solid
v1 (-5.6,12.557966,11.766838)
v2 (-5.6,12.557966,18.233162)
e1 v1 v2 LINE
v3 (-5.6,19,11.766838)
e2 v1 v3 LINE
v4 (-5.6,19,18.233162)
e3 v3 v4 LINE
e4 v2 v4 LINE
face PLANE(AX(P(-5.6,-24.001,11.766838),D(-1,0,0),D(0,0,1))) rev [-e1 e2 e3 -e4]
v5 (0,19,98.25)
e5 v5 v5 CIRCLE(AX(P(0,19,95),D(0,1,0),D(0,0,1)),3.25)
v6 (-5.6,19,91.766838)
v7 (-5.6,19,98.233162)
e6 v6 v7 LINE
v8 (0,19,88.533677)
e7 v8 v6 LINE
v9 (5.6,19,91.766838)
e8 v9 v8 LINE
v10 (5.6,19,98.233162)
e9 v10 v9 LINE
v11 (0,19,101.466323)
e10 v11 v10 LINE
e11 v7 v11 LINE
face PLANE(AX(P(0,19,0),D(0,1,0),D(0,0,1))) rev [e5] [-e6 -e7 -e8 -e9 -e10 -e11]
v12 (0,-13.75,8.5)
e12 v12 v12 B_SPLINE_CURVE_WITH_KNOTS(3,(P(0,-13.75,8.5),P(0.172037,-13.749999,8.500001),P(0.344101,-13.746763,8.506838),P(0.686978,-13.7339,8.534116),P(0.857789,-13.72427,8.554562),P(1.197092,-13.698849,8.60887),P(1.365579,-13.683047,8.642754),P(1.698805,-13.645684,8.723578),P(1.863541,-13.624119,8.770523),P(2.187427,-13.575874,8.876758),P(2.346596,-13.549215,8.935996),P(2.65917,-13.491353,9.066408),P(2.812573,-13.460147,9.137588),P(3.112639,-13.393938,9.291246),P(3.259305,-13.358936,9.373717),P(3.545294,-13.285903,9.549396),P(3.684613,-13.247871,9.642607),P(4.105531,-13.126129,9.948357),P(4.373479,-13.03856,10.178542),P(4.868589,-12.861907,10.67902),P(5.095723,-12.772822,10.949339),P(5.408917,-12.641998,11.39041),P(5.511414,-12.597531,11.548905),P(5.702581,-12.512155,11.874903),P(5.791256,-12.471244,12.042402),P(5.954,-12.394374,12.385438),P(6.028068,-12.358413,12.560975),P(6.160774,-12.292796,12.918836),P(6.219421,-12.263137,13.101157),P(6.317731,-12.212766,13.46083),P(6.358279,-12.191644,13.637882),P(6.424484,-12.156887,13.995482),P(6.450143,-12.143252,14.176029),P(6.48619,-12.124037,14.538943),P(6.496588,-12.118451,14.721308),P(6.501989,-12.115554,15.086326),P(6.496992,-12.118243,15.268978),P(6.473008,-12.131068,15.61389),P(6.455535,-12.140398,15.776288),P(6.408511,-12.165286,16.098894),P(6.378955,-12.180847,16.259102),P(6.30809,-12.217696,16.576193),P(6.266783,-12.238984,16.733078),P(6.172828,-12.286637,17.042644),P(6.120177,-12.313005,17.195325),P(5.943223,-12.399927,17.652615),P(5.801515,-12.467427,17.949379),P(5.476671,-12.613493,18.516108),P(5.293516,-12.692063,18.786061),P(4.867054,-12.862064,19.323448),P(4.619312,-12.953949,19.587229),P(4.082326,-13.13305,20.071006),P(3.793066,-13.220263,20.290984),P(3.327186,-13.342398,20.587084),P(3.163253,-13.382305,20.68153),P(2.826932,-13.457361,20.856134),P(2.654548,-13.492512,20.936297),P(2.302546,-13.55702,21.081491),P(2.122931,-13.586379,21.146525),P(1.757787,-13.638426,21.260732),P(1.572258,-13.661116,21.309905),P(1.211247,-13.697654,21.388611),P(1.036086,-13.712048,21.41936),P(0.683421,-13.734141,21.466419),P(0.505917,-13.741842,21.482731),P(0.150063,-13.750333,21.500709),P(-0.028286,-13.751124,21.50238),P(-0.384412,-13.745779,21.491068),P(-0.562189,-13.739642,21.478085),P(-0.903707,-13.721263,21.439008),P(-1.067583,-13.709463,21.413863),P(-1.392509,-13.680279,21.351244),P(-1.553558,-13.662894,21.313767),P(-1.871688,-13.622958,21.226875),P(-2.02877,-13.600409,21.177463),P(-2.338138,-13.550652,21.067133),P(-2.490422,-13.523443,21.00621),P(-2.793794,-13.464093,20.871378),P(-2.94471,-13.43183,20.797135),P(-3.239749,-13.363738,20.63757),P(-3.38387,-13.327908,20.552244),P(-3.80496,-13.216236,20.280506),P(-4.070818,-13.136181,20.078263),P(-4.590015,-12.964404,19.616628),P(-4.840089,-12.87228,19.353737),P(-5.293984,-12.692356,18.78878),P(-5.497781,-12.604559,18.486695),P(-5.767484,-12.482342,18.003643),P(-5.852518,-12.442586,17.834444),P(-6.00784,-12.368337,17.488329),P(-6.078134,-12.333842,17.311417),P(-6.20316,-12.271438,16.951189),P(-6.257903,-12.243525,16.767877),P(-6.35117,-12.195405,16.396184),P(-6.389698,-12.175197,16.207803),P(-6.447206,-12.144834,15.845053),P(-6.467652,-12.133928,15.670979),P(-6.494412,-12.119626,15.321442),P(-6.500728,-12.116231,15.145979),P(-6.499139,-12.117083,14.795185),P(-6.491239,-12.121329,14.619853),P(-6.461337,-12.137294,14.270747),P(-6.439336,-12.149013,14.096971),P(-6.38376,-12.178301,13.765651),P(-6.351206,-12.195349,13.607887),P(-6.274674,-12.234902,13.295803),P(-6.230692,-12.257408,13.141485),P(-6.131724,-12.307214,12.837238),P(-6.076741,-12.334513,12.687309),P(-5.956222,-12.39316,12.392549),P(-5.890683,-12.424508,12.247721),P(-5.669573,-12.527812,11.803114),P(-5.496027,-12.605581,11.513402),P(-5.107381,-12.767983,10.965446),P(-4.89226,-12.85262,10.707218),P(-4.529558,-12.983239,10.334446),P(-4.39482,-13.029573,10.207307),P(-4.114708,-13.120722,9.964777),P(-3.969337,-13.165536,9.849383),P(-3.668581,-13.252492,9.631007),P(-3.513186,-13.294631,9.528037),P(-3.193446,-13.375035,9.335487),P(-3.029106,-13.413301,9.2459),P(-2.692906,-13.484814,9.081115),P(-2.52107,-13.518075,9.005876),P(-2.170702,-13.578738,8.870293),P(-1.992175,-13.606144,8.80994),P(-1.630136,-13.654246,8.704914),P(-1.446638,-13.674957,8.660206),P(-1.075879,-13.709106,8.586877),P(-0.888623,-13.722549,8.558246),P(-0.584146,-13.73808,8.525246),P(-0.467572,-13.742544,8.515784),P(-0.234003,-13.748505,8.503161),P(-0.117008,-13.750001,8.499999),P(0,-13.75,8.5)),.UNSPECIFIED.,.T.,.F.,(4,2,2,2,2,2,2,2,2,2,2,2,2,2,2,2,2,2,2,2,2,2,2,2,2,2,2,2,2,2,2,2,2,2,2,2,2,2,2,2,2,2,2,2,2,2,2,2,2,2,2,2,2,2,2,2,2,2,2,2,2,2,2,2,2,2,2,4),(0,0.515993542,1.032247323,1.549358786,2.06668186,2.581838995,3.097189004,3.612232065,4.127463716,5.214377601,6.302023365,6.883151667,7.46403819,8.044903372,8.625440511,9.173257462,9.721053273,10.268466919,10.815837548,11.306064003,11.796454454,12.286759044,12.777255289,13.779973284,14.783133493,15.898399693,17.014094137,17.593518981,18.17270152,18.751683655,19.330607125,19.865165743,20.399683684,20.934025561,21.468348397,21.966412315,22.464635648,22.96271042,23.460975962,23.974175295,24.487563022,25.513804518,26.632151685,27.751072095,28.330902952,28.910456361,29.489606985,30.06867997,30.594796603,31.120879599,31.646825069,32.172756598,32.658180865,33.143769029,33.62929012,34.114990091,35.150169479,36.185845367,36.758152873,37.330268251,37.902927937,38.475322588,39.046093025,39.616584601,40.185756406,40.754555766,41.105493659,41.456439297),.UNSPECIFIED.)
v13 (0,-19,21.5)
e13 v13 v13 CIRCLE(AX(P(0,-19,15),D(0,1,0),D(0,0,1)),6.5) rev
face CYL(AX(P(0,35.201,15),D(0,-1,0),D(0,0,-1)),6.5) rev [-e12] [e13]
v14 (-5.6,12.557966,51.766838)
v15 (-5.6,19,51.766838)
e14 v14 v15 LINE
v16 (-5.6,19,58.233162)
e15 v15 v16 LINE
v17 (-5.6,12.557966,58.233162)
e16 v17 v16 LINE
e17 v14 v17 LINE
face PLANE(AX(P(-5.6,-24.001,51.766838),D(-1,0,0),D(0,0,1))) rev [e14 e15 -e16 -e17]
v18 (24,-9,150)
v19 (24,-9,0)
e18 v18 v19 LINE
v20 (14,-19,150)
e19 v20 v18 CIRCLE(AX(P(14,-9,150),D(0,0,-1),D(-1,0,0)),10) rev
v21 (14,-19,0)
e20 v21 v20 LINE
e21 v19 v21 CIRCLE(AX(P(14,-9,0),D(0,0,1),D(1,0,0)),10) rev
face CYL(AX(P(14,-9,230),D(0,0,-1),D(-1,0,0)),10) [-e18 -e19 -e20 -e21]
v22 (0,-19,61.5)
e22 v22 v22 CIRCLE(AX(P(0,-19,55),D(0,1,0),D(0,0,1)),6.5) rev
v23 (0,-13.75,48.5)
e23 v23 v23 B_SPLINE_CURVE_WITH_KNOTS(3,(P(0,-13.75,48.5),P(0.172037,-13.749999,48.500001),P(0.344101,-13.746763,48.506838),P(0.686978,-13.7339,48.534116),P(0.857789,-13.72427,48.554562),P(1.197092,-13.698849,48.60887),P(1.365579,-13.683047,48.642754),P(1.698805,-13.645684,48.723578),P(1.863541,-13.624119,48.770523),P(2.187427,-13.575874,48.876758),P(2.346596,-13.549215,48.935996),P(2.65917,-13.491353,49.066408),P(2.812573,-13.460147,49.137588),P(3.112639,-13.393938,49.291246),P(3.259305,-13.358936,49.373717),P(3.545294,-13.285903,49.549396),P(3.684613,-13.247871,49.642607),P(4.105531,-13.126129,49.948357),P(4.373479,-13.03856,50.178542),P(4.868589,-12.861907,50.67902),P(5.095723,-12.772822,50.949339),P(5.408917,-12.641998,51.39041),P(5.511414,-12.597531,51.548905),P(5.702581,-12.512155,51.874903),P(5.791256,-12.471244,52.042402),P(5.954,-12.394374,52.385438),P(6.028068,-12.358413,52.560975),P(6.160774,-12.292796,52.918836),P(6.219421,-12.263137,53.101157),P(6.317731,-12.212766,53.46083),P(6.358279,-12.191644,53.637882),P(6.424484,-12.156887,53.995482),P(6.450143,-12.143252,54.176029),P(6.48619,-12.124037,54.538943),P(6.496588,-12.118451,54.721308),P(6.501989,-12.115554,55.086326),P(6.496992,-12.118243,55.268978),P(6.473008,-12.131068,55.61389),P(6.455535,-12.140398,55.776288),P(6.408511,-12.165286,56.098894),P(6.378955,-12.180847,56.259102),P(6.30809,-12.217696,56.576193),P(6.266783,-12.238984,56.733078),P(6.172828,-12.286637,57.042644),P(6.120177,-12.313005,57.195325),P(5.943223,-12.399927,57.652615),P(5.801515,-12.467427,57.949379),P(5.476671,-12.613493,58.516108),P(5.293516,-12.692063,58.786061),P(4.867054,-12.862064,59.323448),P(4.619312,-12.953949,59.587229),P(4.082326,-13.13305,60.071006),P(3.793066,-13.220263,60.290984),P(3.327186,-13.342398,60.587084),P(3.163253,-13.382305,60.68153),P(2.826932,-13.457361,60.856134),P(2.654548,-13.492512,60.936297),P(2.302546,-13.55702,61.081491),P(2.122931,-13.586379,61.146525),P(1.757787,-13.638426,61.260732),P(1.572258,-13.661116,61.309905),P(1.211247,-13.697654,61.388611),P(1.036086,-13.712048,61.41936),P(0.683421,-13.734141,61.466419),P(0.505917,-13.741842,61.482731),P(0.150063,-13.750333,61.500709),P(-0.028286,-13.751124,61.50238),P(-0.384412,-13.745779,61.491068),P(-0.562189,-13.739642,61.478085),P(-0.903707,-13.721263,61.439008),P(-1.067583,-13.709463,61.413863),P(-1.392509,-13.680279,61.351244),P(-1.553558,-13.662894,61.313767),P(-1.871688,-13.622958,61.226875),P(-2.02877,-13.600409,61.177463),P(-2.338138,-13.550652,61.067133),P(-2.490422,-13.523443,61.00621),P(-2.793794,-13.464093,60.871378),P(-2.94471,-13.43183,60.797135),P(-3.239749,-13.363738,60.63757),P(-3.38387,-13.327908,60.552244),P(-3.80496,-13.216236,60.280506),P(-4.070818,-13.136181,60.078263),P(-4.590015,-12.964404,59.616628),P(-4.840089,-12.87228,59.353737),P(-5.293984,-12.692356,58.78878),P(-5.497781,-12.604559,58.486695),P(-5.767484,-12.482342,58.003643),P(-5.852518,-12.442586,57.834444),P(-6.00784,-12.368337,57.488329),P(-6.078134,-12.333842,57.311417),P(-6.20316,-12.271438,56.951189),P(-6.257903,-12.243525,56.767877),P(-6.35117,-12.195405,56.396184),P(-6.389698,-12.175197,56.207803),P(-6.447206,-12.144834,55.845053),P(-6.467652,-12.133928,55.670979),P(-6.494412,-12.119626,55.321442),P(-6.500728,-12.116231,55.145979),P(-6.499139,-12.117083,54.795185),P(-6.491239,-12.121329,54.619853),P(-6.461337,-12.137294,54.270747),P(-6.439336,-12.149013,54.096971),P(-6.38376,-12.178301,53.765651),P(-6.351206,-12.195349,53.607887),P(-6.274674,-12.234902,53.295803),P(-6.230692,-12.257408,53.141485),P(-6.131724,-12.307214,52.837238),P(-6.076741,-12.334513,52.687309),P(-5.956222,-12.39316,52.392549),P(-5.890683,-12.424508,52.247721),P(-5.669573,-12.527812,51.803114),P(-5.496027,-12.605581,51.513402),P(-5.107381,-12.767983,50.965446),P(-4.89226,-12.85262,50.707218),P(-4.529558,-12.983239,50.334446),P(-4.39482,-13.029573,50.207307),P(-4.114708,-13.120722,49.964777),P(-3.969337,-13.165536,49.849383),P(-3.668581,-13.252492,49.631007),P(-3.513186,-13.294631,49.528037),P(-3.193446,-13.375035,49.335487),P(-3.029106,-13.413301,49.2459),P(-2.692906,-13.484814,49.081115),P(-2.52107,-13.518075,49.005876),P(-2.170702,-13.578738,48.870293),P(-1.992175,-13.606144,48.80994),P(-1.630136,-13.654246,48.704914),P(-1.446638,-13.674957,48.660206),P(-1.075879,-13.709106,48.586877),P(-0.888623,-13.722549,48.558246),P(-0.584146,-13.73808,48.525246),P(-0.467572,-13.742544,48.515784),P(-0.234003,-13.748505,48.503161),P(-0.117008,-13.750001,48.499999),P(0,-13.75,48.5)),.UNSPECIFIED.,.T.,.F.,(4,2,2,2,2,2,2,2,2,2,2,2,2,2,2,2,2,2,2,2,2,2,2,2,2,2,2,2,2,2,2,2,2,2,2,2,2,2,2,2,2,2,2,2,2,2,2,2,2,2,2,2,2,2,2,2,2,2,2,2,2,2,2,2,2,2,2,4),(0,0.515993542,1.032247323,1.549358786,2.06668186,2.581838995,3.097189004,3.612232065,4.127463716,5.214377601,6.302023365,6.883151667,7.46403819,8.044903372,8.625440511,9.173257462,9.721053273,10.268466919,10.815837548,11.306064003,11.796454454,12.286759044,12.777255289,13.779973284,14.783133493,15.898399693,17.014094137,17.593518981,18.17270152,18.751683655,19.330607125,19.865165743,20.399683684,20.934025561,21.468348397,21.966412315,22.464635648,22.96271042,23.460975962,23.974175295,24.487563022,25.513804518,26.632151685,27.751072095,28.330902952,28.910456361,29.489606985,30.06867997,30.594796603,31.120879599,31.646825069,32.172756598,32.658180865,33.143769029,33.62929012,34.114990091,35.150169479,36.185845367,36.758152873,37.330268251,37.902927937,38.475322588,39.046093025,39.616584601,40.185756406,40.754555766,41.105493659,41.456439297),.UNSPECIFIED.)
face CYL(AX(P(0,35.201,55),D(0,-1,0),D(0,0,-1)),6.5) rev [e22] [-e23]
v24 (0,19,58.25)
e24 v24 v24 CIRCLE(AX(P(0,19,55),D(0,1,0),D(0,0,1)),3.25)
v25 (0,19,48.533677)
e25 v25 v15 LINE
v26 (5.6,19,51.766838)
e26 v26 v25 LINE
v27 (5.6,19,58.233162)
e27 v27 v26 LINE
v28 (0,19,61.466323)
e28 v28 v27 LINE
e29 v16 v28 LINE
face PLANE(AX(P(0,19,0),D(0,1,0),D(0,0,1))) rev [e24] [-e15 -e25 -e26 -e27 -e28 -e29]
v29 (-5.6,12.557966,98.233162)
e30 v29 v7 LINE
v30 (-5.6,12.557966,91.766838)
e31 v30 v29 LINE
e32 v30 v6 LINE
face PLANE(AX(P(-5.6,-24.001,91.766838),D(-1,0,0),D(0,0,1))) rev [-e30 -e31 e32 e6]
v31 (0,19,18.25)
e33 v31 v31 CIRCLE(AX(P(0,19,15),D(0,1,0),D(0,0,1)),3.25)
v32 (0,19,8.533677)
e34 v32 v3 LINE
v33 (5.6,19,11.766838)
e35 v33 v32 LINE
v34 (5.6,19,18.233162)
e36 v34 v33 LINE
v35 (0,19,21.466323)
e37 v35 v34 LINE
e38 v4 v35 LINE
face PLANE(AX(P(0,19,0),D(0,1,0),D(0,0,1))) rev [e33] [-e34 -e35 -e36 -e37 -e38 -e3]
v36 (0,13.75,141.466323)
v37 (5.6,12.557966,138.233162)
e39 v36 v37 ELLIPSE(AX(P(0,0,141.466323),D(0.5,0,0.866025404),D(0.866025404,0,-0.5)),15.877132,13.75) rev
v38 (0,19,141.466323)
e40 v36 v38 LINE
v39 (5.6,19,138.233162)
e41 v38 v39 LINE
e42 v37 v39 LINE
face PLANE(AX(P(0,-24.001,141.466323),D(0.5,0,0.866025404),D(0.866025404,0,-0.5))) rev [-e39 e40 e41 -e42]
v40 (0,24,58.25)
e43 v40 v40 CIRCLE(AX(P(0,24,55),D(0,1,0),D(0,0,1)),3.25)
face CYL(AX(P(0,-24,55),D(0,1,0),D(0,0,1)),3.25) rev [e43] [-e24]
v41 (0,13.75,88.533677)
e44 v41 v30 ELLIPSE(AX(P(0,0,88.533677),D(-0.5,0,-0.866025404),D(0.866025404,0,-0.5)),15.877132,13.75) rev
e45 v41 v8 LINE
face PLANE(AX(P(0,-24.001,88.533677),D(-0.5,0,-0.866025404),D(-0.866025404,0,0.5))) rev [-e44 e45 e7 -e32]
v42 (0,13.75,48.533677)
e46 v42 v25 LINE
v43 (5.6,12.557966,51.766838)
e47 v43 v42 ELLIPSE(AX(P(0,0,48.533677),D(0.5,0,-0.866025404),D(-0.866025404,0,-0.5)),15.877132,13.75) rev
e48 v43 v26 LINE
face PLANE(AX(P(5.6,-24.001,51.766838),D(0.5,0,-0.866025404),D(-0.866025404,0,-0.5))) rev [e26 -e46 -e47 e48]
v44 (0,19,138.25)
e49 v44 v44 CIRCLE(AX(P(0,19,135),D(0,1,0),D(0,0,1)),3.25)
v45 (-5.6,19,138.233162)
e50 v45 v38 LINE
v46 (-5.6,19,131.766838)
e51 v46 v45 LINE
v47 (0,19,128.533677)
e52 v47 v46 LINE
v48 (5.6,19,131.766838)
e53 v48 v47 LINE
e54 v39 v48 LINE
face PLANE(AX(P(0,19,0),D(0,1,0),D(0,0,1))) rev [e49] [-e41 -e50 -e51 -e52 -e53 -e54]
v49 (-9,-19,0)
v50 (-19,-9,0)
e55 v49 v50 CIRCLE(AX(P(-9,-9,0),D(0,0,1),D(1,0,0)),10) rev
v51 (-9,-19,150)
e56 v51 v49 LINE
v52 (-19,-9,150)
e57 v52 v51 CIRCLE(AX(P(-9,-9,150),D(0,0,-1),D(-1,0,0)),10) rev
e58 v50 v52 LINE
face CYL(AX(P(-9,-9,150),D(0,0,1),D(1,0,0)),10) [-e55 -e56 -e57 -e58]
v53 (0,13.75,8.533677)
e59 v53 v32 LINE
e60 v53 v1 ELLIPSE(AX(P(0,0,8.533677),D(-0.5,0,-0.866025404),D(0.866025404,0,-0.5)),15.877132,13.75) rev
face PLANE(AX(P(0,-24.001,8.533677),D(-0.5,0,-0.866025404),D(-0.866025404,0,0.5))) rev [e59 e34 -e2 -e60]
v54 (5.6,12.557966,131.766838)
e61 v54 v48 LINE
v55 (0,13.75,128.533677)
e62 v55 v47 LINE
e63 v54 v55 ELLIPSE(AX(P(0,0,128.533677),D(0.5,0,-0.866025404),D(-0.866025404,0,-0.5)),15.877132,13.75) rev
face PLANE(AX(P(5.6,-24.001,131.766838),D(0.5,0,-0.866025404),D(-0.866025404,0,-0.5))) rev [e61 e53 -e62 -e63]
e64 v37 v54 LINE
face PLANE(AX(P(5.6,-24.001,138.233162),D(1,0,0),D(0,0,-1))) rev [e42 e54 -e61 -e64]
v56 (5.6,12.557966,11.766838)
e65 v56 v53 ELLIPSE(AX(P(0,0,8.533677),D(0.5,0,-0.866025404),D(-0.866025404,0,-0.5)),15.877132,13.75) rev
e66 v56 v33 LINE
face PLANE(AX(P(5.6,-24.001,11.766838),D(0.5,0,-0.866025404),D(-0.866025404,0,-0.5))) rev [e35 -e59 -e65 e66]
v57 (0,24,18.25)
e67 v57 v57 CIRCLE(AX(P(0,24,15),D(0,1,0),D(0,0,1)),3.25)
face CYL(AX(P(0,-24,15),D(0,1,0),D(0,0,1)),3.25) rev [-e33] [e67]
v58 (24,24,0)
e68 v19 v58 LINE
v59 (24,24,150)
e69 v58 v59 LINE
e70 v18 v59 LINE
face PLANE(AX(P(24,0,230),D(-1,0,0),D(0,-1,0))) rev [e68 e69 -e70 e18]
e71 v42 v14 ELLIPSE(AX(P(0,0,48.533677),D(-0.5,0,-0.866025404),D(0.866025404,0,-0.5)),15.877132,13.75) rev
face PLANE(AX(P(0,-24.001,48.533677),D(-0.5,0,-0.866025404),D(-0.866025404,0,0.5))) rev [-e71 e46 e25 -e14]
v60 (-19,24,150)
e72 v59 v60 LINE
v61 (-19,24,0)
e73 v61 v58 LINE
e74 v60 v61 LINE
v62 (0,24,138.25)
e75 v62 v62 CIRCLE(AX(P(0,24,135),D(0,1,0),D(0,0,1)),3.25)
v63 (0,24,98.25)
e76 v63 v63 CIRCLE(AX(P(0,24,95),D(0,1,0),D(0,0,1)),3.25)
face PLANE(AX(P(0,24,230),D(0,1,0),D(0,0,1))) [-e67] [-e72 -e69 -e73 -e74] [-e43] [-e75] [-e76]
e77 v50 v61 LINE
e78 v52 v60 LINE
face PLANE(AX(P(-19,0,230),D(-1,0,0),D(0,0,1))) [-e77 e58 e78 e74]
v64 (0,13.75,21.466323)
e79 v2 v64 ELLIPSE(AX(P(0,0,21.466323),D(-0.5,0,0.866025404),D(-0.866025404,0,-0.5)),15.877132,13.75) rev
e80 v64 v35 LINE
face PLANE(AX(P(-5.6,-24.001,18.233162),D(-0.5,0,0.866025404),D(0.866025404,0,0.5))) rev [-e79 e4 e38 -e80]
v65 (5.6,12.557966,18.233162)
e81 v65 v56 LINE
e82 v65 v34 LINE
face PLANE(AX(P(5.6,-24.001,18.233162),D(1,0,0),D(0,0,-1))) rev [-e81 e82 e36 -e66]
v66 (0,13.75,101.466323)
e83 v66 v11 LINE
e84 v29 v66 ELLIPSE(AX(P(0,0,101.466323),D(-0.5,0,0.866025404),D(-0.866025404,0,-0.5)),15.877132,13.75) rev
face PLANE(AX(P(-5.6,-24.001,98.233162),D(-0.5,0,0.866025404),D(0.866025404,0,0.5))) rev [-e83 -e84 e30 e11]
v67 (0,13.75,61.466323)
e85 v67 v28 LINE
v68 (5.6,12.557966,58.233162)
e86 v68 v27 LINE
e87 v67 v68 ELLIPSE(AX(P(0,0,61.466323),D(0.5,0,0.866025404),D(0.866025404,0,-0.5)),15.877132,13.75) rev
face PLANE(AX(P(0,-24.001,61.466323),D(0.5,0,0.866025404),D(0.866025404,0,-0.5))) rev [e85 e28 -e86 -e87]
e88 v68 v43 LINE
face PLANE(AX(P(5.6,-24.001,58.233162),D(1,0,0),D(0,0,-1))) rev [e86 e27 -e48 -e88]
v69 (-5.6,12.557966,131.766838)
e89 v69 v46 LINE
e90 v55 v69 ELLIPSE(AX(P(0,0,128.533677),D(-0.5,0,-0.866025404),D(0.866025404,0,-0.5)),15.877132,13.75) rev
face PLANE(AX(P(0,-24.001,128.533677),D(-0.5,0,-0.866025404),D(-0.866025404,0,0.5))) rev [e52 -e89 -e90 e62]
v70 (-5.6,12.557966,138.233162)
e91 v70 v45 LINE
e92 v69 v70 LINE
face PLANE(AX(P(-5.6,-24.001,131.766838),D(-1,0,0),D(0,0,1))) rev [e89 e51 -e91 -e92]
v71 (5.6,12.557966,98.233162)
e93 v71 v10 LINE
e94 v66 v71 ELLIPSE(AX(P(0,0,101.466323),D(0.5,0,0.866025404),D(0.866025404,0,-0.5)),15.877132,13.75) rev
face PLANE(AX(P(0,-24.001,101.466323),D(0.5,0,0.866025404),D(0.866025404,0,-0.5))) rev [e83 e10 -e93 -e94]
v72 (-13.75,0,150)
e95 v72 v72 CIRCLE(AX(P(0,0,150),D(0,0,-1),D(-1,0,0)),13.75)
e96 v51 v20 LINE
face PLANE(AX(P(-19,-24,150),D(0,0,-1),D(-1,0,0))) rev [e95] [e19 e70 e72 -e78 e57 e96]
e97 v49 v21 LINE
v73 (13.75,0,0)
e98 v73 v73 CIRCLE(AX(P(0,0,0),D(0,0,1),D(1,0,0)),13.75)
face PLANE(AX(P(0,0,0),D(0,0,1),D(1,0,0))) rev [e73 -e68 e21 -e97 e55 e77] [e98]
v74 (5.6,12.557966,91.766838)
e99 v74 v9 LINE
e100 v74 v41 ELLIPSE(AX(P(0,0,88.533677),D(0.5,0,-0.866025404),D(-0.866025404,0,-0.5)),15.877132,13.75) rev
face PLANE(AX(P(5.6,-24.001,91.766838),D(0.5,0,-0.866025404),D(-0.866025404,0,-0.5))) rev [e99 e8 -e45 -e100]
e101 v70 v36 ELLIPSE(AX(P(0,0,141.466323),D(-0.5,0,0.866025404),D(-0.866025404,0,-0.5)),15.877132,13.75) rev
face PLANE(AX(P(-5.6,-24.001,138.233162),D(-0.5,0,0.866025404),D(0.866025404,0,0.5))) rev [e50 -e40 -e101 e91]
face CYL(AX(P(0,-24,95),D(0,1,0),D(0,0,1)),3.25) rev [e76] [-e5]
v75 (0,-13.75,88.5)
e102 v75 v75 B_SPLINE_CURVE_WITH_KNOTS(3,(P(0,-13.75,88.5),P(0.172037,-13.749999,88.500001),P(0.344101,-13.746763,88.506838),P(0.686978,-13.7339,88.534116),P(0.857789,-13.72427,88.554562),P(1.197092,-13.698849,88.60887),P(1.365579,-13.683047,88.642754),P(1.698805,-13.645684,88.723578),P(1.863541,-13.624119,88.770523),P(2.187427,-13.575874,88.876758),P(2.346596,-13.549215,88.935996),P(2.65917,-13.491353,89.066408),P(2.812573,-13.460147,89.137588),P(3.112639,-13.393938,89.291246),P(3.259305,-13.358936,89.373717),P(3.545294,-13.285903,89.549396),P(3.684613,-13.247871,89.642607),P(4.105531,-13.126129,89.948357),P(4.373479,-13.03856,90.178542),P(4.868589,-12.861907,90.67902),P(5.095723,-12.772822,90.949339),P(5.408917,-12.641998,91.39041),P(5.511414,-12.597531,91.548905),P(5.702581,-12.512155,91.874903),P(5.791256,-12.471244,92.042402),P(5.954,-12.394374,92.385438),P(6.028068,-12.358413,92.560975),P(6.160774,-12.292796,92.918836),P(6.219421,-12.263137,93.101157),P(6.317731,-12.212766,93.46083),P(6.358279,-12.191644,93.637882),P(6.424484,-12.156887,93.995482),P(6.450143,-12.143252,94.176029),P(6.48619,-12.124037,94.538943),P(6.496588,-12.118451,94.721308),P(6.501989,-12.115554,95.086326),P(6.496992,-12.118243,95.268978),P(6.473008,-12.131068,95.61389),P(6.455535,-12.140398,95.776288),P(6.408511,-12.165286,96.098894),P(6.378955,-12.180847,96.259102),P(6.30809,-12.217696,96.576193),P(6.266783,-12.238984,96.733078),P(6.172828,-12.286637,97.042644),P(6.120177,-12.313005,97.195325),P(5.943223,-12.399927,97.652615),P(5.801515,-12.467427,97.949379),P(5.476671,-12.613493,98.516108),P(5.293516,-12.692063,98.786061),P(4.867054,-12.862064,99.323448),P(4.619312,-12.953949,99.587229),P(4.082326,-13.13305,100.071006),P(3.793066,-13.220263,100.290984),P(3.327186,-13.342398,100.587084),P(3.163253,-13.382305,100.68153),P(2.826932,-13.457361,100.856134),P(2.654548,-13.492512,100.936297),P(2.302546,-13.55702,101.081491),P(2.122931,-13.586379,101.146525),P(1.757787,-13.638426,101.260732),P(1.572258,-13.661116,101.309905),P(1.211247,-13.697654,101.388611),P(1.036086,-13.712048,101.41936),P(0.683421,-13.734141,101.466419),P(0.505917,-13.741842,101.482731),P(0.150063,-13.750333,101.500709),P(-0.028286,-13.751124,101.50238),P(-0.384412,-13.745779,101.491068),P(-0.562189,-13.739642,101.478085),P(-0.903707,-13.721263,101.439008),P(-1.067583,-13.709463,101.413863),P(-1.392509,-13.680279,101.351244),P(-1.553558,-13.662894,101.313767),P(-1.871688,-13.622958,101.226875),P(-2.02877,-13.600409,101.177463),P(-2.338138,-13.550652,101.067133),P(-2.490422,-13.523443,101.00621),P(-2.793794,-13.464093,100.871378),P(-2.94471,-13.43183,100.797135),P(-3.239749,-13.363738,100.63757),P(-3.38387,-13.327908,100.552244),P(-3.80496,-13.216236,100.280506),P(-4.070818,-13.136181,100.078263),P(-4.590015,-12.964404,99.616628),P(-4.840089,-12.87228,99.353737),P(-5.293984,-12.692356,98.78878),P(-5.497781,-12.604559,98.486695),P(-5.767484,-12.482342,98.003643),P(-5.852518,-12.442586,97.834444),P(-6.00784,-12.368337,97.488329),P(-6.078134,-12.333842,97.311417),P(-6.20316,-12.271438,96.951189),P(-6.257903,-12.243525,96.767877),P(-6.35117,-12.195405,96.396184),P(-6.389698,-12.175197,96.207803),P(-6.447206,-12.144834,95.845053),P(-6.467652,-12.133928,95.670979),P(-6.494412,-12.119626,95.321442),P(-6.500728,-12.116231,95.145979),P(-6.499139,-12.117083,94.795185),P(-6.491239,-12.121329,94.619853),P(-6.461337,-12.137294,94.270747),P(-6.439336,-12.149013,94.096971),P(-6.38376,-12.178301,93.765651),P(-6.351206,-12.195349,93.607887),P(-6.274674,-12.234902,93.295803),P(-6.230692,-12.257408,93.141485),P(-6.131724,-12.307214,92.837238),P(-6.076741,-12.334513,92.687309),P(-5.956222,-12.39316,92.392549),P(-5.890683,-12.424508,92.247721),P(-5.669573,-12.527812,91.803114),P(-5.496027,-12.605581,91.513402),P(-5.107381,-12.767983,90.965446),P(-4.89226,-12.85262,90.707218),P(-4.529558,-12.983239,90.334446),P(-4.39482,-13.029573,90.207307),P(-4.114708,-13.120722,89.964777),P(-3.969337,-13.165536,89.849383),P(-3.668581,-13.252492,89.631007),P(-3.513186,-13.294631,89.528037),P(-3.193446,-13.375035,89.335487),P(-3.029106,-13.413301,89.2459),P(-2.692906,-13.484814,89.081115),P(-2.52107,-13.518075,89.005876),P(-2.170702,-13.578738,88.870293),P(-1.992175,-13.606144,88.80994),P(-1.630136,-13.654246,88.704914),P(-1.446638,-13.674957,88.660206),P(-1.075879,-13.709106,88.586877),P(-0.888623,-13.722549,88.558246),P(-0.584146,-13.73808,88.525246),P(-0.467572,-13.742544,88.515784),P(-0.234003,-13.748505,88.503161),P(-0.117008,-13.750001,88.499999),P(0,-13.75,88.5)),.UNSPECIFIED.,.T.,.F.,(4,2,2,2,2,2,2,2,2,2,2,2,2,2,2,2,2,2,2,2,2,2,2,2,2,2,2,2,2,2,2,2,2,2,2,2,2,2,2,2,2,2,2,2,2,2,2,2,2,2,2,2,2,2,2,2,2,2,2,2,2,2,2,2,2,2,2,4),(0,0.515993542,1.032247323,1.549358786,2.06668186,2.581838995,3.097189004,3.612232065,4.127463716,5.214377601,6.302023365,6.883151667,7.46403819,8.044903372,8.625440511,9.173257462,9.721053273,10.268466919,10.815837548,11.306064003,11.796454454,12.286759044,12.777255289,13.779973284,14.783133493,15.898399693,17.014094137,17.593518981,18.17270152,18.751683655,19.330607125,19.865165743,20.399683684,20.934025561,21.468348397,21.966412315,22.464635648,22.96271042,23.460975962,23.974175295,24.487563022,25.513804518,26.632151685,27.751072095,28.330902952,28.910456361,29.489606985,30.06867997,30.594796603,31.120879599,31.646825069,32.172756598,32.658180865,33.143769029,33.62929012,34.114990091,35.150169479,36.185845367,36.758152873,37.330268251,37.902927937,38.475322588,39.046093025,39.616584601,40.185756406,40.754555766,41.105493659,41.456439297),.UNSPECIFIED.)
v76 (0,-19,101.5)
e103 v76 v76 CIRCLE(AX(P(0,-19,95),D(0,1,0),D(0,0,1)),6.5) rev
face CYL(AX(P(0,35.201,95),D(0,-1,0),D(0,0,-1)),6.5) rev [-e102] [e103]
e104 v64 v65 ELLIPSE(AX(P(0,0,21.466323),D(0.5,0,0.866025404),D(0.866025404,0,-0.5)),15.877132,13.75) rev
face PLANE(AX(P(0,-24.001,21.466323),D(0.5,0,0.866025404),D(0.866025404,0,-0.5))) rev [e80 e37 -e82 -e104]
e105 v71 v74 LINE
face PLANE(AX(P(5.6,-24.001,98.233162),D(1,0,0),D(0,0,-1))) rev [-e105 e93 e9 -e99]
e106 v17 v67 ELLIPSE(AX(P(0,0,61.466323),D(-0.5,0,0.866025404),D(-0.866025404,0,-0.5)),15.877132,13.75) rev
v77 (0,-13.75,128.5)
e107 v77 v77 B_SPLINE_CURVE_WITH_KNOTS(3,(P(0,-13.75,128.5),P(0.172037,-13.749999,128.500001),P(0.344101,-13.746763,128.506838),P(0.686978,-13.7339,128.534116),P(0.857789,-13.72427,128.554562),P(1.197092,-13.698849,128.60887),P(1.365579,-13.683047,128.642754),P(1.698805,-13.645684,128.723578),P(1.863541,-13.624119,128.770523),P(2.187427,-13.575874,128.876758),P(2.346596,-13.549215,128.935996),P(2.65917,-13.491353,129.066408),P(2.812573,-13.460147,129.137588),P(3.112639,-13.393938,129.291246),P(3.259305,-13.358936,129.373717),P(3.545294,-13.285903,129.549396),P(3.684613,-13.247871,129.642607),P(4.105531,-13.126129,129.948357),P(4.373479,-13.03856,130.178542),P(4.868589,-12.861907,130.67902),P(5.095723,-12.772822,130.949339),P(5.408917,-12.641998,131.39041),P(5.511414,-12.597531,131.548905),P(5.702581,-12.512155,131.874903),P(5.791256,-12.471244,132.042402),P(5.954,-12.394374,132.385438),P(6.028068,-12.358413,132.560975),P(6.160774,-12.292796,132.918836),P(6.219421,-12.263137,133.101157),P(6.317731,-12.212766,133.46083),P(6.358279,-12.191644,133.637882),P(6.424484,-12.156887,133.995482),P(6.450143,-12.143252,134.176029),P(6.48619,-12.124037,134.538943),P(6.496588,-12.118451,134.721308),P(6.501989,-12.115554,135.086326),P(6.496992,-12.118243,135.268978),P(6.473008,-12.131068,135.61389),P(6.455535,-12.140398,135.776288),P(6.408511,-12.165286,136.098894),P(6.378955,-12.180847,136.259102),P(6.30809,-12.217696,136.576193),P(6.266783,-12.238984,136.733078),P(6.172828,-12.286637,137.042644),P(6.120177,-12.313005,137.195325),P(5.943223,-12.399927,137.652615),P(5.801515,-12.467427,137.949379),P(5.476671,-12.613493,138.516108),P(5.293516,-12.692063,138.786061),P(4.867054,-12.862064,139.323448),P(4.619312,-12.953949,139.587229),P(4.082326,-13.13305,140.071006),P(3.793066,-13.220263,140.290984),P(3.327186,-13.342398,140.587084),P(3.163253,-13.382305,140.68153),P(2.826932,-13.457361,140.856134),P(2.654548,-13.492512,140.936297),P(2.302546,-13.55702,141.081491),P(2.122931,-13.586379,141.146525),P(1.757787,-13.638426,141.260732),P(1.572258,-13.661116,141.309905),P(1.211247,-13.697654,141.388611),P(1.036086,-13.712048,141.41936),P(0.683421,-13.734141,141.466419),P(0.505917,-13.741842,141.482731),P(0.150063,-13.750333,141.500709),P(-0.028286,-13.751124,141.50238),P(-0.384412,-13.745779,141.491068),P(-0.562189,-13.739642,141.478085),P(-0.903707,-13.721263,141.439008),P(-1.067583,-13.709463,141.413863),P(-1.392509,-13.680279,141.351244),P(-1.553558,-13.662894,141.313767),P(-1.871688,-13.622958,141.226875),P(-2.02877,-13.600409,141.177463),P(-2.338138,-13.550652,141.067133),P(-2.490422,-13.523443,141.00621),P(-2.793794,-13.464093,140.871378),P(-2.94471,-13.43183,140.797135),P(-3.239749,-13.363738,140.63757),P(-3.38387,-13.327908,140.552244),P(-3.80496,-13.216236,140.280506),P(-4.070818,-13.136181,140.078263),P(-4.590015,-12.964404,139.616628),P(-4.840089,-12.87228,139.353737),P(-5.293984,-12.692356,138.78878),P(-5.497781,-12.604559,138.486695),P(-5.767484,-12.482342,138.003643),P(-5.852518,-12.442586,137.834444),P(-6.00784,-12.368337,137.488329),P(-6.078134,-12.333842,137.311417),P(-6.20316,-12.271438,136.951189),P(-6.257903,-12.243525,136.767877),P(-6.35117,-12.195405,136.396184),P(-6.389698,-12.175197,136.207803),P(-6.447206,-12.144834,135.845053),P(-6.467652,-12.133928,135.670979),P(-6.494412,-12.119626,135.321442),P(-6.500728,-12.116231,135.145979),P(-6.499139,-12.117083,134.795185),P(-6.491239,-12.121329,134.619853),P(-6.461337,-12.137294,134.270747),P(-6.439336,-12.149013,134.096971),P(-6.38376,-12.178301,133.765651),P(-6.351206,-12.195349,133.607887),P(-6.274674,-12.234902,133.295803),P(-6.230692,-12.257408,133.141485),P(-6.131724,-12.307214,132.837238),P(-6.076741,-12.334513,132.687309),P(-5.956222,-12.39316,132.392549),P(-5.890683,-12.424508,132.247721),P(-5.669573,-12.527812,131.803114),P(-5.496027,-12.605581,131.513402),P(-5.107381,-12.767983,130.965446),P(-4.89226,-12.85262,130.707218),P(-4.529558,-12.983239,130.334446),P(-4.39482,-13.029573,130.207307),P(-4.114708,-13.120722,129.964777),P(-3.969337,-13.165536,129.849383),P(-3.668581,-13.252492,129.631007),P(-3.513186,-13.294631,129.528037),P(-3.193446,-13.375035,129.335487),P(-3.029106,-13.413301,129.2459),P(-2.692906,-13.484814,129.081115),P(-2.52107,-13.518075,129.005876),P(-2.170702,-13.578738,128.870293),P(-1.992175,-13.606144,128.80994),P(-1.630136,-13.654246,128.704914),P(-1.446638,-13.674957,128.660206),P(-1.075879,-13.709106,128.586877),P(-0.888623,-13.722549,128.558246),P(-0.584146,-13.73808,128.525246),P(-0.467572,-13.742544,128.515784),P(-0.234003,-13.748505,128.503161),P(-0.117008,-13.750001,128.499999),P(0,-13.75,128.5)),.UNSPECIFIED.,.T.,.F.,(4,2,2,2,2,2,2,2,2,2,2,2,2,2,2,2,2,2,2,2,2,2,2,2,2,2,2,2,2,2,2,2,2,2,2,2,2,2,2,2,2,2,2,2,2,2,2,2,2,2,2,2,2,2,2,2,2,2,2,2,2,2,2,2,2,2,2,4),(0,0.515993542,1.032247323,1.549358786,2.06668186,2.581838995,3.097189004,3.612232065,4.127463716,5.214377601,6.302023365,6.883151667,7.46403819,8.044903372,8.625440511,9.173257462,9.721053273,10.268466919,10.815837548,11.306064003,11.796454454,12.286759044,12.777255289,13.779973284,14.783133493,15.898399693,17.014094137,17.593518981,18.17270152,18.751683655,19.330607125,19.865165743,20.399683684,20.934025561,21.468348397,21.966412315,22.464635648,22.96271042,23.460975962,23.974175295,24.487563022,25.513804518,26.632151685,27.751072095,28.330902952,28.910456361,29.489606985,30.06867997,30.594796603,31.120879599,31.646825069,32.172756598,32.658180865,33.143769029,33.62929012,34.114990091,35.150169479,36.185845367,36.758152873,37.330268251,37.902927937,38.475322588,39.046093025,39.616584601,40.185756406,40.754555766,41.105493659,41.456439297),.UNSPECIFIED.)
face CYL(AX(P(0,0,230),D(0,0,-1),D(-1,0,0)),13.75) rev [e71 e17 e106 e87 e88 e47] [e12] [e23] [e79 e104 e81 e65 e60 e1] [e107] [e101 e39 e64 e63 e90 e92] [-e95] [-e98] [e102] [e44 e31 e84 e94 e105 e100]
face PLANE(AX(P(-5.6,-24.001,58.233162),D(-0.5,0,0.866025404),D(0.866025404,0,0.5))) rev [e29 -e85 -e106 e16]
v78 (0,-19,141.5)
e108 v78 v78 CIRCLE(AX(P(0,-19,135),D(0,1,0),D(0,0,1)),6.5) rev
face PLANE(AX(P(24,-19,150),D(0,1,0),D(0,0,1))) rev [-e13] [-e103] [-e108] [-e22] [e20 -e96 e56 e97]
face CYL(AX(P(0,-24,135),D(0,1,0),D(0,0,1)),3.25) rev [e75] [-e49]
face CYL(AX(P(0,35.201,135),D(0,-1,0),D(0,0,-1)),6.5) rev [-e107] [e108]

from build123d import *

# Parameters (mm, degrees)
SKETCH1_W               = 38
SKETCH1_H               = 48
SKETCH1_R               = 13.75
SKETCH1_H_2             = 10
BOSS_EXTRUDE1_DEPTH     = 230
SKETCH3_R               = 6
CUT_EXTRUDE1_DEPTH      = 0.5
SKETCH4_R               = 3.25
CUT_EXTRUDE2_DEPTH      = 239.706179225
CUT_EXTRUDE3_REACH      = 240.706
CUT_EXTRUDE3_END_RADIUS = 13.75
SKETCH5_R               = 6.5
CUT_EXTRUDE4_REACH      = 243.178
CUT_EXTRUDE4_END_RADIUS = 13.75
CUT_EXTRUDE4_START      = -5
CHAMFER1_SIZE           = 5
SKETCH8_W               = 230
SKETCH8_H               = 1.2
CUT_EXTRUDE6_DEPTH      = 10
SKETCH9_W               = 43
SKETCH9_H               = 80
CUT_EXTRUDE7_DEPTH      = 237.177899168
SKETCH10_W              = 43
SKETCH10_H              = 5
CUT_EXTRUDE8_DEPTH      = 154.792067529
FILLET1_R               = 10


with BuildPart() as part:
    # Sketch1 → Boss-Extrude1 (new body)
    # profile 1 of 3: a face of its own
    with BuildSketch(Plane.XY):
        Rectangle(SKETCH1_W, SKETCH1_H)
        Circle(SKETCH1_R, mode=Mode.SUBTRACT)
    # profile 2 of 3: a face of its own
    with BuildSketch(Plane.XY):
        with Locations((0, 30.2)):
            Rectangle(SKETCH1_W, SKETCH1_H_2)
    # profile 3 of 3: a face of its own
    with BuildSketch(Plane.XY):
        Polygon((19, 24), (19, -24), (24, -24), (24, 35.2), (19, 35.2), (19, 25.2), align=None)
    extrude(amount=BOSS_EXTRUDE1_DEPTH)

    # Sketch3 → Cut-Extrude1 (cut)
    with BuildSketch(Plane(origin=(0, 35.2, 0), x_dir=(1, 0, 0), z_dir=(0, 1, 0))):
        with Locations(Location((0, -15, 0), (0, 0, 270))):
            Circle(SKETCH3_R)
        with Locations(Location((0, -55, 0), (0, 0, 270))):
            Circle(SKETCH3_R)
        with Locations(Location((0, -95, 0), (0, 0, 270))):
            Circle(SKETCH3_R)
        with Locations(Location((0, -135, 0), (0, 0, 270))):
            Circle(SKETCH3_R)
        with Locations(Location((0, -175, 0), (0, 0, 270))):
            Circle(SKETCH3_R)
        with Locations(Location((0, -215, 0), (0, 0, 270))):
            Circle(SKETCH3_R)
    extrude(amount=-CUT_EXTRUDE1_DEPTH, mode=Mode.SUBTRACT)

    # Sketch4 → Cut-Extrude2 (cut, through all)
    with BuildSketch(Plane(origin=(0, 35.2, 0), x_dir=(1, 0, 0), z_dir=(0, 1, 0))):
        with Locations(Location((0, -15, 0), (0, 0, 270))):
            Circle(SKETCH4_R)
        with Locations(Location((0, -55, 0), (0, 0, 270))):
            Circle(SKETCH4_R)
        with Locations(Location((0, -95, 0), (0, 0, 270))):
            Circle(SKETCH4_R)
        with Locations(Location((0, -135, 0), (0, 0, 270))):
            Circle(SKETCH4_R)
        with Locations(Location((0, -175, 0), (0, 0, 270))):
            Circle(SKETCH4_R)
        with Locations(Location((0, -215, 0), (0, 0, 270))):
            Circle(SKETCH4_R)
    extrude(amount=-CUT_EXTRUDE2_DEPTH, mode=Mode.SUBTRACT)

    # Cut-Extrude3: up to this cylinder (the profile starts outside it)
    cut_extrude3_end = Plane(origin=(0, 0, 115), z_dir=(0, 0, -1)) * Cylinder(CUT_EXTRUDE3_END_RADIUS, 709.912, mode=Mode.PRIVATE)
    # Sketch5 → Cut-Extrude3 (cut, up to the surface)
    with BuildSketch(Plane.XZ.offset(24), mode=Mode.PRIVATE) as cut_extrude3_sk1:
        with Locations(Location((0, 215, 0), (0, 0, 270))):
            Circle(SKETCH5_R)
    cut_extrude3_tool1 = extrude(cut_extrude3_sk1.sketch, amount=-CUT_EXTRUDE3_REACH, mode=Mode.PRIVATE) - cut_extrude3_end
    add(cut_extrude3_tool1.solids().sort_by_distance((0, -24, 215))[0], mode=Mode.SUBTRACT)
    # Sketch5 → Cut-Extrude3 (cut, up to the surface)
    with BuildSketch(Plane.XZ.offset(24), mode=Mode.PRIVATE) as cut_extrude3_sk2:
        with Locations(Location((0, 175, 0), (0, 0, 270))):
            Circle(SKETCH5_R)
    cut_extrude3_tool2 = extrude(cut_extrude3_sk2.sketch, amount=-CUT_EXTRUDE3_REACH, mode=Mode.PRIVATE) - cut_extrude3_end
    add(cut_extrude3_tool2.solids().sort_by_distance((0, -24, 175))[0], mode=Mode.SUBTRACT)
    # Sketch5 → Cut-Extrude3 (cut, up to the surface)
    with BuildSketch(Plane.XZ.offset(24), mode=Mode.PRIVATE) as cut_extrude3_sk3:
        with Locations(Location((0, 135, 0), (0, 0, 270))):
            Circle(SKETCH5_R)
    cut_extrude3_tool3 = extrude(cut_extrude3_sk3.sketch, amount=-CUT_EXTRUDE3_REACH, mode=Mode.PRIVATE) - cut_extrude3_end
    add(cut_extrude3_tool3.solids().sort_by_distance((0, -24, 135))[0], mode=Mode.SUBTRACT)
    # Sketch5 → Cut-Extrude3 (cut, up to the surface)
    with BuildSketch(Plane.XZ.offset(24), mode=Mode.PRIVATE) as cut_extrude3_sk4:
        with Locations(Location((0, 95, 0), (0, 0, 270))):
            Circle(SKETCH5_R)
    cut_extrude3_tool4 = extrude(cut_extrude3_sk4.sketch, amount=-CUT_EXTRUDE3_REACH, mode=Mode.PRIVATE) - cut_extrude3_end
    add(cut_extrude3_tool4.solids().sort_by_distance((0, -24, 95))[0], mode=Mode.SUBTRACT)
    # Sketch5 → Cut-Extrude3 (cut, up to the surface)
    with BuildSketch(Plane.XZ.offset(24), mode=Mode.PRIVATE) as cut_extrude3_sk5:
        with Locations(Location((0, 55, 0), (0, 0, 270))):
            Circle(SKETCH5_R)
    cut_extrude3_tool5 = extrude(cut_extrude3_sk5.sketch, amount=-CUT_EXTRUDE3_REACH, mode=Mode.PRIVATE) - cut_extrude3_end
    add(cut_extrude3_tool5.solids().sort_by_distance((0, -24, 55))[0], mode=Mode.SUBTRACT)
    # Sketch5 → Cut-Extrude3 (cut, up to the surface)
    with BuildSketch(Plane.XZ.offset(24), mode=Mode.PRIVATE) as cut_extrude3_sk6:
        with Locations(Location((0, 15, 0), (0, 0, 270))):
            Circle(SKETCH5_R)
    cut_extrude3_tool6 = extrude(cut_extrude3_sk6.sketch, amount=-CUT_EXTRUDE3_REACH, mode=Mode.PRIVATE) - cut_extrude3_end
    add(cut_extrude3_tool6.solids().sort_by_distance((0, -24, 15))[0], mode=Mode.SUBTRACT)

    # Cut-Extrude4: up to this cylinder (the profile starts outside it)
    cut_extrude4_end = Plane(origin=(0, 0, 115), z_dir=(0, 0, -1)) * Cylinder(CUT_EXTRUDE4_END_RADIUS, 714.856, mode=Mode.PRIVATE)
    # Sketch7 → Cut-Extrude4 (cut, up to the surface)
    with BuildSketch(Plane(origin=(0, 24, 0), x_dir=(1, 0, 0), z_dir=(0, 1, 0)).offset(CUT_EXTRUDE4_START), mode=Mode.PRIVATE) as cut_extrude4_sk1:
        Polygon((0, -8.533676985), (-5.6, -11.766838493), (-5.6, -18.233161507), (0, -21.466323015), (5.6, -18.233161507), (5.6, -11.766838493), align=None)
    cut_extrude4_tool1 = extrude(cut_extrude4_sk1.sketch, amount=-CUT_EXTRUDE4_REACH, mode=Mode.PRIVATE) - cut_extrude4_end
    add(cut_extrude4_tool1.solids().sort_by_distance((0, 19, 15))[0], mode=Mode.SUBTRACT)
    # Sketch7 → Cut-Extrude4 (cut, up to the surface)
    with BuildSketch(Plane(origin=(0, 24, 0), x_dir=(1, 0, 0), z_dir=(0, 1, 0)).offset(CUT_EXTRUDE4_START), mode=Mode.PRIVATE) as cut_extrude4_sk2:
        Polygon((0, -48.533676985), (-5.6, -51.766838493), (-5.6, -58.233161507), (0, -61.466323015), (5.6, -58.233161507), (5.6, -51.766838493), align=None)
    cut_extrude4_tool2 = extrude(cut_extrude4_sk2.sketch, amount=-CUT_EXTRUDE4_REACH, mode=Mode.PRIVATE) - cut_extrude4_end
    add(cut_extrude4_tool2.solids().sort_by_distance((0, 19, 55))[0], mode=Mode.SUBTRACT)
    # Sketch7 → Cut-Extrude4 (cut, up to the surface)
    with BuildSketch(Plane(origin=(0, 24, 0), x_dir=(1, 0, 0), z_dir=(0, 1, 0)).offset(CUT_EXTRUDE4_START), mode=Mode.PRIVATE) as cut_extrude4_sk3:
        Polygon((0, -88.533676985), (-5.6, -91.766838493), (-5.6, -98.233161507), (0, -101.466323015), (5.6, -98.233161507), (5.6, -91.766838493), align=None)
    cut_extrude4_tool3 = extrude(cut_extrude4_sk3.sketch, amount=-CUT_EXTRUDE4_REACH, mode=Mode.PRIVATE) - cut_extrude4_end
    add(cut_extrude4_tool3.solids().sort_by_distance((0, 19, 95))[0], mode=Mode.SUBTRACT)
    # Sketch7 → Cut-Extrude4 (cut, up to the surface)
    with BuildSketch(Plane(origin=(0, 24, 0), x_dir=(1, 0, 0), z_dir=(0, 1, 0)).offset(CUT_EXTRUDE4_START), mode=Mode.PRIVATE) as cut_extrude4_sk4:
        Polygon((0, -128.533676985), (-5.6, -131.766838493), (-5.6, -138.233161507), (0, -141.466323015), (5.6, -138.233161507), (5.6, -131.766838493), align=None)
    cut_extrude4_tool4 = extrude(cut_extrude4_sk4.sketch, amount=-CUT_EXTRUDE4_REACH, mode=Mode.PRIVATE) - cut_extrude4_end
    add(cut_extrude4_tool4.solids().sort_by_distance((0, 19, 135))[0], mode=Mode.SUBTRACT)
    # Sketch7 → Cut-Extrude4 (cut, up to the surface)
    with BuildSketch(Plane(origin=(0, 24, 0), x_dir=(1, 0, 0), z_dir=(0, 1, 0)).offset(CUT_EXTRUDE4_START), mode=Mode.PRIVATE) as cut_extrude4_sk5:
        Polygon((0, -168.533676985), (-5.6, -171.766838493), (-5.6, -178.233161507), (0, -181.466323015), (5.6, -178.233161507), (5.6, -171.766838493), align=None)
    cut_extrude4_tool5 = extrude(cut_extrude4_sk5.sketch, amount=-CUT_EXTRUDE4_REACH, mode=Mode.PRIVATE) - cut_extrude4_end
    add(cut_extrude4_tool5.solids().sort_by_distance((0, 19, 175))[0], mode=Mode.SUBTRACT)
    # Sketch7 → Cut-Extrude4 (cut, up to the surface)
    with BuildSketch(Plane(origin=(0, 24, 0), x_dir=(1, 0, 0), z_dir=(0, 1, 0)).offset(CUT_EXTRUDE4_START), mode=Mode.PRIVATE) as cut_extrude4_sk6:
        Polygon((0, -208.533676985), (-5.6, -211.766838493), (-5.6, -218.233161507), (0, -221.466323015), (5.6, -218.233161507), (5.6, -211.766838493), align=None)
    cut_extrude4_tool6 = extrude(cut_extrude4_sk6.sketch, amount=-CUT_EXTRUDE4_REACH, mode=Mode.PRIVATE) - cut_extrude4_end
    add(cut_extrude4_tool6.solids().sort_by_distance((0, 19, 215))[0], mode=Mode.SUBTRACT)

    # Chamfer1
    # the kernel refuses this chamfer: 5 mm, written as the material it takes off along each edge
    with BuildSketch(Plane(origin=(0, 34.7, 215), x_dir=(0, 0, 1), z_dir=(-1, 0, 0))) as chamfer1_piece_1_section:
        Polygon((3.25, -CHAMFER1_SIZE), (3.25 + CHAMFER1_SIZE, 0), (3.25, 0), align=None)
    chamfer1_piece_1 = revolve(axis=Axis((0, 34.7, 215), (0, 1, 0)), mode=Mode.PRIVATE)
    chamfer1_piece_1 = chamfer1_piece_1 & Plane(origin=(0, 31.051548399, 215), x_dir=(0, 0, 1), z_dir=(0, 1, 0)) * Cylinder(6, 33, mode=Mode.PRIVATE)
    add(chamfer1_piece_1, mode=Mode.SUBTRACT)
    with BuildSketch(Plane(origin=(0, 34.7, 175), x_dir=(0, 0, 1), z_dir=(-1, 0, 0))) as chamfer1_piece_2_section:
        Polygon((3.25, -CHAMFER1_SIZE), (3.25 + CHAMFER1_SIZE, 0), (3.25, 0), align=None)
    chamfer1_piece_2 = revolve(axis=Axis((0, 34.7, 175), (0, 1, 0)), mode=Mode.PRIVATE)
    chamfer1_piece_2 = chamfer1_piece_2 & Plane(origin=(0, 31.051548399, 175), x_dir=(0, 0, 1), z_dir=(0, 1, 0)) * Cylinder(6, 33, mode=Mode.PRIVATE)
    add(chamfer1_piece_2, mode=Mode.SUBTRACT)
    with BuildSketch(Plane(origin=(0, 34.7, 135), x_dir=(0, 0, 1), z_dir=(-1, 0, 0))) as chamfer1_piece_3_section:
        Polygon((3.25, -CHAMFER1_SIZE), (3.25 + CHAMFER1_SIZE, 0), (3.25, 0), align=None)
    chamfer1_piece_3 = revolve(axis=Axis((0, 34.7, 135), (0, 1, 0)), mode=Mode.PRIVATE)
    chamfer1_piece_3 = chamfer1_piece_3 & Plane(origin=(0, 31.051548399, 135), x_dir=(0, 0, 1), z_dir=(0, 1, 0)) * Cylinder(6, 33, mode=Mode.PRIVATE)
    add(chamfer1_piece_3, mode=Mode.SUBTRACT)
    with BuildSketch(Plane(origin=(0, 34.7, 95), x_dir=(0, 0, 1), z_dir=(-1, 0, 0))) as chamfer1_piece_4_section:
        Polygon((3.25, -CHAMFER1_SIZE), (3.25 + CHAMFER1_SIZE, 0), (3.25, 0), align=None)
    chamfer1_piece_4 = revolve(axis=Axis((0, 34.7, 95), (0, 1, 0)), mode=Mode.PRIVATE)
    chamfer1_piece_4 = chamfer1_piece_4 & Plane(origin=(0, 31.051548399, 95), x_dir=(0, 0, 1), z_dir=(0, 1, 0)) * Cylinder(6, 33, mode=Mode.PRIVATE)
    add(chamfer1_piece_4, mode=Mode.SUBTRACT)
    with BuildSketch(Plane(origin=(0, 34.7, 55), x_dir=(0, 0, 1), z_dir=(-1, 0, 0))) as chamfer1_piece_5_section:
        Polygon((3.25, -CHAMFER1_SIZE), (3.25 + CHAMFER1_SIZE, 0), (3.25, 0), align=None)
    chamfer1_piece_5 = revolve(axis=Axis((0, 34.7, 55), (0, 1, 0)), mode=Mode.PRIVATE)
    chamfer1_piece_5 = chamfer1_piece_5 & Plane(origin=(0, 31.051548399, 55), x_dir=(0, 0, 1), z_dir=(0, 1, 0)) * Cylinder(6, 33, mode=Mode.PRIVATE)
    add(chamfer1_piece_5, mode=Mode.SUBTRACT)
    with BuildSketch(Plane(origin=(0, 34.7, 15), x_dir=(0, 0, 1), z_dir=(-1, 0, 0))) as chamfer1_piece_6_section:
        Polygon((3.25, -CHAMFER1_SIZE), (3.25 + CHAMFER1_SIZE, 0), (3.25, 0), align=None)
    chamfer1_piece_6 = revolve(axis=Axis((0, 34.7, 15), (0, 1, 0)), mode=Mode.PRIVATE)
    chamfer1_piece_6 = chamfer1_piece_6 & Plane(origin=(0, 31.051548399, 15), x_dir=(0, 0, 1), z_dir=(0, 1, 0)) * Cylinder(6, 33, mode=Mode.PRIVATE)
    add(chamfer1_piece_6, mode=Mode.SUBTRACT)

    # Sketch8 → Cut-Extrude6 (cut)
    with BuildSketch(Plane.ZY.offset(-19)):
        with Locations((115, 24.6)):
            Rectangle(SKETCH8_W, SKETCH8_H)
    extrude(amount=-CUT_EXTRUDE6_DEPTH, mode=Mode.SUBTRACT)


with BuildPart() as cut_extrude6_kept_piece:
    # of the separate pieces the step leaves, the one the design keeps (cut_extrude6_pieces_kept)
    add(part.part.solids().sort_by_distance((-19, -24, 0))[0])

    # Sketch9 → Cut-Extrude7 (cut, through all)
    with BuildSketch(Plane(origin=(0, 24, 0), x_dir=(1, 0, 0), z_dir=(0, 1, 0))):
        with Locations((2.5, -190)):
            Rectangle(SKETCH9_W, SKETCH9_H)
    extrude(amount=-CUT_EXTRUDE7_DEPTH, mode=Mode.SUBTRACT)

    # Sketch10 → Cut-Extrude8 (cut, through all)
    with BuildSketch(Plane(origin=(0, 0, 0), x_dir=(-1, 0, 0), z_dir=(0, 0, -1))):
        with Locations((-2.5, -21.5)):
            Rectangle(SKETCH10_W, SKETCH10_H)
    extrude(amount=-CUT_EXTRUDE8_DEPTH, mode=Mode.SUBTRACT)

    # Fillet1
    fillet1_edges = [cut_extrude6_kept_piece.edges().sort_by_distance(p)[0] for p in [
        (24, -19, 75),
        (-19, -19, 75),
    ]]
    fillet(fillet1_edges, radius=FILLET1_R)


solid = cut_extrude6_kept_piece.part
